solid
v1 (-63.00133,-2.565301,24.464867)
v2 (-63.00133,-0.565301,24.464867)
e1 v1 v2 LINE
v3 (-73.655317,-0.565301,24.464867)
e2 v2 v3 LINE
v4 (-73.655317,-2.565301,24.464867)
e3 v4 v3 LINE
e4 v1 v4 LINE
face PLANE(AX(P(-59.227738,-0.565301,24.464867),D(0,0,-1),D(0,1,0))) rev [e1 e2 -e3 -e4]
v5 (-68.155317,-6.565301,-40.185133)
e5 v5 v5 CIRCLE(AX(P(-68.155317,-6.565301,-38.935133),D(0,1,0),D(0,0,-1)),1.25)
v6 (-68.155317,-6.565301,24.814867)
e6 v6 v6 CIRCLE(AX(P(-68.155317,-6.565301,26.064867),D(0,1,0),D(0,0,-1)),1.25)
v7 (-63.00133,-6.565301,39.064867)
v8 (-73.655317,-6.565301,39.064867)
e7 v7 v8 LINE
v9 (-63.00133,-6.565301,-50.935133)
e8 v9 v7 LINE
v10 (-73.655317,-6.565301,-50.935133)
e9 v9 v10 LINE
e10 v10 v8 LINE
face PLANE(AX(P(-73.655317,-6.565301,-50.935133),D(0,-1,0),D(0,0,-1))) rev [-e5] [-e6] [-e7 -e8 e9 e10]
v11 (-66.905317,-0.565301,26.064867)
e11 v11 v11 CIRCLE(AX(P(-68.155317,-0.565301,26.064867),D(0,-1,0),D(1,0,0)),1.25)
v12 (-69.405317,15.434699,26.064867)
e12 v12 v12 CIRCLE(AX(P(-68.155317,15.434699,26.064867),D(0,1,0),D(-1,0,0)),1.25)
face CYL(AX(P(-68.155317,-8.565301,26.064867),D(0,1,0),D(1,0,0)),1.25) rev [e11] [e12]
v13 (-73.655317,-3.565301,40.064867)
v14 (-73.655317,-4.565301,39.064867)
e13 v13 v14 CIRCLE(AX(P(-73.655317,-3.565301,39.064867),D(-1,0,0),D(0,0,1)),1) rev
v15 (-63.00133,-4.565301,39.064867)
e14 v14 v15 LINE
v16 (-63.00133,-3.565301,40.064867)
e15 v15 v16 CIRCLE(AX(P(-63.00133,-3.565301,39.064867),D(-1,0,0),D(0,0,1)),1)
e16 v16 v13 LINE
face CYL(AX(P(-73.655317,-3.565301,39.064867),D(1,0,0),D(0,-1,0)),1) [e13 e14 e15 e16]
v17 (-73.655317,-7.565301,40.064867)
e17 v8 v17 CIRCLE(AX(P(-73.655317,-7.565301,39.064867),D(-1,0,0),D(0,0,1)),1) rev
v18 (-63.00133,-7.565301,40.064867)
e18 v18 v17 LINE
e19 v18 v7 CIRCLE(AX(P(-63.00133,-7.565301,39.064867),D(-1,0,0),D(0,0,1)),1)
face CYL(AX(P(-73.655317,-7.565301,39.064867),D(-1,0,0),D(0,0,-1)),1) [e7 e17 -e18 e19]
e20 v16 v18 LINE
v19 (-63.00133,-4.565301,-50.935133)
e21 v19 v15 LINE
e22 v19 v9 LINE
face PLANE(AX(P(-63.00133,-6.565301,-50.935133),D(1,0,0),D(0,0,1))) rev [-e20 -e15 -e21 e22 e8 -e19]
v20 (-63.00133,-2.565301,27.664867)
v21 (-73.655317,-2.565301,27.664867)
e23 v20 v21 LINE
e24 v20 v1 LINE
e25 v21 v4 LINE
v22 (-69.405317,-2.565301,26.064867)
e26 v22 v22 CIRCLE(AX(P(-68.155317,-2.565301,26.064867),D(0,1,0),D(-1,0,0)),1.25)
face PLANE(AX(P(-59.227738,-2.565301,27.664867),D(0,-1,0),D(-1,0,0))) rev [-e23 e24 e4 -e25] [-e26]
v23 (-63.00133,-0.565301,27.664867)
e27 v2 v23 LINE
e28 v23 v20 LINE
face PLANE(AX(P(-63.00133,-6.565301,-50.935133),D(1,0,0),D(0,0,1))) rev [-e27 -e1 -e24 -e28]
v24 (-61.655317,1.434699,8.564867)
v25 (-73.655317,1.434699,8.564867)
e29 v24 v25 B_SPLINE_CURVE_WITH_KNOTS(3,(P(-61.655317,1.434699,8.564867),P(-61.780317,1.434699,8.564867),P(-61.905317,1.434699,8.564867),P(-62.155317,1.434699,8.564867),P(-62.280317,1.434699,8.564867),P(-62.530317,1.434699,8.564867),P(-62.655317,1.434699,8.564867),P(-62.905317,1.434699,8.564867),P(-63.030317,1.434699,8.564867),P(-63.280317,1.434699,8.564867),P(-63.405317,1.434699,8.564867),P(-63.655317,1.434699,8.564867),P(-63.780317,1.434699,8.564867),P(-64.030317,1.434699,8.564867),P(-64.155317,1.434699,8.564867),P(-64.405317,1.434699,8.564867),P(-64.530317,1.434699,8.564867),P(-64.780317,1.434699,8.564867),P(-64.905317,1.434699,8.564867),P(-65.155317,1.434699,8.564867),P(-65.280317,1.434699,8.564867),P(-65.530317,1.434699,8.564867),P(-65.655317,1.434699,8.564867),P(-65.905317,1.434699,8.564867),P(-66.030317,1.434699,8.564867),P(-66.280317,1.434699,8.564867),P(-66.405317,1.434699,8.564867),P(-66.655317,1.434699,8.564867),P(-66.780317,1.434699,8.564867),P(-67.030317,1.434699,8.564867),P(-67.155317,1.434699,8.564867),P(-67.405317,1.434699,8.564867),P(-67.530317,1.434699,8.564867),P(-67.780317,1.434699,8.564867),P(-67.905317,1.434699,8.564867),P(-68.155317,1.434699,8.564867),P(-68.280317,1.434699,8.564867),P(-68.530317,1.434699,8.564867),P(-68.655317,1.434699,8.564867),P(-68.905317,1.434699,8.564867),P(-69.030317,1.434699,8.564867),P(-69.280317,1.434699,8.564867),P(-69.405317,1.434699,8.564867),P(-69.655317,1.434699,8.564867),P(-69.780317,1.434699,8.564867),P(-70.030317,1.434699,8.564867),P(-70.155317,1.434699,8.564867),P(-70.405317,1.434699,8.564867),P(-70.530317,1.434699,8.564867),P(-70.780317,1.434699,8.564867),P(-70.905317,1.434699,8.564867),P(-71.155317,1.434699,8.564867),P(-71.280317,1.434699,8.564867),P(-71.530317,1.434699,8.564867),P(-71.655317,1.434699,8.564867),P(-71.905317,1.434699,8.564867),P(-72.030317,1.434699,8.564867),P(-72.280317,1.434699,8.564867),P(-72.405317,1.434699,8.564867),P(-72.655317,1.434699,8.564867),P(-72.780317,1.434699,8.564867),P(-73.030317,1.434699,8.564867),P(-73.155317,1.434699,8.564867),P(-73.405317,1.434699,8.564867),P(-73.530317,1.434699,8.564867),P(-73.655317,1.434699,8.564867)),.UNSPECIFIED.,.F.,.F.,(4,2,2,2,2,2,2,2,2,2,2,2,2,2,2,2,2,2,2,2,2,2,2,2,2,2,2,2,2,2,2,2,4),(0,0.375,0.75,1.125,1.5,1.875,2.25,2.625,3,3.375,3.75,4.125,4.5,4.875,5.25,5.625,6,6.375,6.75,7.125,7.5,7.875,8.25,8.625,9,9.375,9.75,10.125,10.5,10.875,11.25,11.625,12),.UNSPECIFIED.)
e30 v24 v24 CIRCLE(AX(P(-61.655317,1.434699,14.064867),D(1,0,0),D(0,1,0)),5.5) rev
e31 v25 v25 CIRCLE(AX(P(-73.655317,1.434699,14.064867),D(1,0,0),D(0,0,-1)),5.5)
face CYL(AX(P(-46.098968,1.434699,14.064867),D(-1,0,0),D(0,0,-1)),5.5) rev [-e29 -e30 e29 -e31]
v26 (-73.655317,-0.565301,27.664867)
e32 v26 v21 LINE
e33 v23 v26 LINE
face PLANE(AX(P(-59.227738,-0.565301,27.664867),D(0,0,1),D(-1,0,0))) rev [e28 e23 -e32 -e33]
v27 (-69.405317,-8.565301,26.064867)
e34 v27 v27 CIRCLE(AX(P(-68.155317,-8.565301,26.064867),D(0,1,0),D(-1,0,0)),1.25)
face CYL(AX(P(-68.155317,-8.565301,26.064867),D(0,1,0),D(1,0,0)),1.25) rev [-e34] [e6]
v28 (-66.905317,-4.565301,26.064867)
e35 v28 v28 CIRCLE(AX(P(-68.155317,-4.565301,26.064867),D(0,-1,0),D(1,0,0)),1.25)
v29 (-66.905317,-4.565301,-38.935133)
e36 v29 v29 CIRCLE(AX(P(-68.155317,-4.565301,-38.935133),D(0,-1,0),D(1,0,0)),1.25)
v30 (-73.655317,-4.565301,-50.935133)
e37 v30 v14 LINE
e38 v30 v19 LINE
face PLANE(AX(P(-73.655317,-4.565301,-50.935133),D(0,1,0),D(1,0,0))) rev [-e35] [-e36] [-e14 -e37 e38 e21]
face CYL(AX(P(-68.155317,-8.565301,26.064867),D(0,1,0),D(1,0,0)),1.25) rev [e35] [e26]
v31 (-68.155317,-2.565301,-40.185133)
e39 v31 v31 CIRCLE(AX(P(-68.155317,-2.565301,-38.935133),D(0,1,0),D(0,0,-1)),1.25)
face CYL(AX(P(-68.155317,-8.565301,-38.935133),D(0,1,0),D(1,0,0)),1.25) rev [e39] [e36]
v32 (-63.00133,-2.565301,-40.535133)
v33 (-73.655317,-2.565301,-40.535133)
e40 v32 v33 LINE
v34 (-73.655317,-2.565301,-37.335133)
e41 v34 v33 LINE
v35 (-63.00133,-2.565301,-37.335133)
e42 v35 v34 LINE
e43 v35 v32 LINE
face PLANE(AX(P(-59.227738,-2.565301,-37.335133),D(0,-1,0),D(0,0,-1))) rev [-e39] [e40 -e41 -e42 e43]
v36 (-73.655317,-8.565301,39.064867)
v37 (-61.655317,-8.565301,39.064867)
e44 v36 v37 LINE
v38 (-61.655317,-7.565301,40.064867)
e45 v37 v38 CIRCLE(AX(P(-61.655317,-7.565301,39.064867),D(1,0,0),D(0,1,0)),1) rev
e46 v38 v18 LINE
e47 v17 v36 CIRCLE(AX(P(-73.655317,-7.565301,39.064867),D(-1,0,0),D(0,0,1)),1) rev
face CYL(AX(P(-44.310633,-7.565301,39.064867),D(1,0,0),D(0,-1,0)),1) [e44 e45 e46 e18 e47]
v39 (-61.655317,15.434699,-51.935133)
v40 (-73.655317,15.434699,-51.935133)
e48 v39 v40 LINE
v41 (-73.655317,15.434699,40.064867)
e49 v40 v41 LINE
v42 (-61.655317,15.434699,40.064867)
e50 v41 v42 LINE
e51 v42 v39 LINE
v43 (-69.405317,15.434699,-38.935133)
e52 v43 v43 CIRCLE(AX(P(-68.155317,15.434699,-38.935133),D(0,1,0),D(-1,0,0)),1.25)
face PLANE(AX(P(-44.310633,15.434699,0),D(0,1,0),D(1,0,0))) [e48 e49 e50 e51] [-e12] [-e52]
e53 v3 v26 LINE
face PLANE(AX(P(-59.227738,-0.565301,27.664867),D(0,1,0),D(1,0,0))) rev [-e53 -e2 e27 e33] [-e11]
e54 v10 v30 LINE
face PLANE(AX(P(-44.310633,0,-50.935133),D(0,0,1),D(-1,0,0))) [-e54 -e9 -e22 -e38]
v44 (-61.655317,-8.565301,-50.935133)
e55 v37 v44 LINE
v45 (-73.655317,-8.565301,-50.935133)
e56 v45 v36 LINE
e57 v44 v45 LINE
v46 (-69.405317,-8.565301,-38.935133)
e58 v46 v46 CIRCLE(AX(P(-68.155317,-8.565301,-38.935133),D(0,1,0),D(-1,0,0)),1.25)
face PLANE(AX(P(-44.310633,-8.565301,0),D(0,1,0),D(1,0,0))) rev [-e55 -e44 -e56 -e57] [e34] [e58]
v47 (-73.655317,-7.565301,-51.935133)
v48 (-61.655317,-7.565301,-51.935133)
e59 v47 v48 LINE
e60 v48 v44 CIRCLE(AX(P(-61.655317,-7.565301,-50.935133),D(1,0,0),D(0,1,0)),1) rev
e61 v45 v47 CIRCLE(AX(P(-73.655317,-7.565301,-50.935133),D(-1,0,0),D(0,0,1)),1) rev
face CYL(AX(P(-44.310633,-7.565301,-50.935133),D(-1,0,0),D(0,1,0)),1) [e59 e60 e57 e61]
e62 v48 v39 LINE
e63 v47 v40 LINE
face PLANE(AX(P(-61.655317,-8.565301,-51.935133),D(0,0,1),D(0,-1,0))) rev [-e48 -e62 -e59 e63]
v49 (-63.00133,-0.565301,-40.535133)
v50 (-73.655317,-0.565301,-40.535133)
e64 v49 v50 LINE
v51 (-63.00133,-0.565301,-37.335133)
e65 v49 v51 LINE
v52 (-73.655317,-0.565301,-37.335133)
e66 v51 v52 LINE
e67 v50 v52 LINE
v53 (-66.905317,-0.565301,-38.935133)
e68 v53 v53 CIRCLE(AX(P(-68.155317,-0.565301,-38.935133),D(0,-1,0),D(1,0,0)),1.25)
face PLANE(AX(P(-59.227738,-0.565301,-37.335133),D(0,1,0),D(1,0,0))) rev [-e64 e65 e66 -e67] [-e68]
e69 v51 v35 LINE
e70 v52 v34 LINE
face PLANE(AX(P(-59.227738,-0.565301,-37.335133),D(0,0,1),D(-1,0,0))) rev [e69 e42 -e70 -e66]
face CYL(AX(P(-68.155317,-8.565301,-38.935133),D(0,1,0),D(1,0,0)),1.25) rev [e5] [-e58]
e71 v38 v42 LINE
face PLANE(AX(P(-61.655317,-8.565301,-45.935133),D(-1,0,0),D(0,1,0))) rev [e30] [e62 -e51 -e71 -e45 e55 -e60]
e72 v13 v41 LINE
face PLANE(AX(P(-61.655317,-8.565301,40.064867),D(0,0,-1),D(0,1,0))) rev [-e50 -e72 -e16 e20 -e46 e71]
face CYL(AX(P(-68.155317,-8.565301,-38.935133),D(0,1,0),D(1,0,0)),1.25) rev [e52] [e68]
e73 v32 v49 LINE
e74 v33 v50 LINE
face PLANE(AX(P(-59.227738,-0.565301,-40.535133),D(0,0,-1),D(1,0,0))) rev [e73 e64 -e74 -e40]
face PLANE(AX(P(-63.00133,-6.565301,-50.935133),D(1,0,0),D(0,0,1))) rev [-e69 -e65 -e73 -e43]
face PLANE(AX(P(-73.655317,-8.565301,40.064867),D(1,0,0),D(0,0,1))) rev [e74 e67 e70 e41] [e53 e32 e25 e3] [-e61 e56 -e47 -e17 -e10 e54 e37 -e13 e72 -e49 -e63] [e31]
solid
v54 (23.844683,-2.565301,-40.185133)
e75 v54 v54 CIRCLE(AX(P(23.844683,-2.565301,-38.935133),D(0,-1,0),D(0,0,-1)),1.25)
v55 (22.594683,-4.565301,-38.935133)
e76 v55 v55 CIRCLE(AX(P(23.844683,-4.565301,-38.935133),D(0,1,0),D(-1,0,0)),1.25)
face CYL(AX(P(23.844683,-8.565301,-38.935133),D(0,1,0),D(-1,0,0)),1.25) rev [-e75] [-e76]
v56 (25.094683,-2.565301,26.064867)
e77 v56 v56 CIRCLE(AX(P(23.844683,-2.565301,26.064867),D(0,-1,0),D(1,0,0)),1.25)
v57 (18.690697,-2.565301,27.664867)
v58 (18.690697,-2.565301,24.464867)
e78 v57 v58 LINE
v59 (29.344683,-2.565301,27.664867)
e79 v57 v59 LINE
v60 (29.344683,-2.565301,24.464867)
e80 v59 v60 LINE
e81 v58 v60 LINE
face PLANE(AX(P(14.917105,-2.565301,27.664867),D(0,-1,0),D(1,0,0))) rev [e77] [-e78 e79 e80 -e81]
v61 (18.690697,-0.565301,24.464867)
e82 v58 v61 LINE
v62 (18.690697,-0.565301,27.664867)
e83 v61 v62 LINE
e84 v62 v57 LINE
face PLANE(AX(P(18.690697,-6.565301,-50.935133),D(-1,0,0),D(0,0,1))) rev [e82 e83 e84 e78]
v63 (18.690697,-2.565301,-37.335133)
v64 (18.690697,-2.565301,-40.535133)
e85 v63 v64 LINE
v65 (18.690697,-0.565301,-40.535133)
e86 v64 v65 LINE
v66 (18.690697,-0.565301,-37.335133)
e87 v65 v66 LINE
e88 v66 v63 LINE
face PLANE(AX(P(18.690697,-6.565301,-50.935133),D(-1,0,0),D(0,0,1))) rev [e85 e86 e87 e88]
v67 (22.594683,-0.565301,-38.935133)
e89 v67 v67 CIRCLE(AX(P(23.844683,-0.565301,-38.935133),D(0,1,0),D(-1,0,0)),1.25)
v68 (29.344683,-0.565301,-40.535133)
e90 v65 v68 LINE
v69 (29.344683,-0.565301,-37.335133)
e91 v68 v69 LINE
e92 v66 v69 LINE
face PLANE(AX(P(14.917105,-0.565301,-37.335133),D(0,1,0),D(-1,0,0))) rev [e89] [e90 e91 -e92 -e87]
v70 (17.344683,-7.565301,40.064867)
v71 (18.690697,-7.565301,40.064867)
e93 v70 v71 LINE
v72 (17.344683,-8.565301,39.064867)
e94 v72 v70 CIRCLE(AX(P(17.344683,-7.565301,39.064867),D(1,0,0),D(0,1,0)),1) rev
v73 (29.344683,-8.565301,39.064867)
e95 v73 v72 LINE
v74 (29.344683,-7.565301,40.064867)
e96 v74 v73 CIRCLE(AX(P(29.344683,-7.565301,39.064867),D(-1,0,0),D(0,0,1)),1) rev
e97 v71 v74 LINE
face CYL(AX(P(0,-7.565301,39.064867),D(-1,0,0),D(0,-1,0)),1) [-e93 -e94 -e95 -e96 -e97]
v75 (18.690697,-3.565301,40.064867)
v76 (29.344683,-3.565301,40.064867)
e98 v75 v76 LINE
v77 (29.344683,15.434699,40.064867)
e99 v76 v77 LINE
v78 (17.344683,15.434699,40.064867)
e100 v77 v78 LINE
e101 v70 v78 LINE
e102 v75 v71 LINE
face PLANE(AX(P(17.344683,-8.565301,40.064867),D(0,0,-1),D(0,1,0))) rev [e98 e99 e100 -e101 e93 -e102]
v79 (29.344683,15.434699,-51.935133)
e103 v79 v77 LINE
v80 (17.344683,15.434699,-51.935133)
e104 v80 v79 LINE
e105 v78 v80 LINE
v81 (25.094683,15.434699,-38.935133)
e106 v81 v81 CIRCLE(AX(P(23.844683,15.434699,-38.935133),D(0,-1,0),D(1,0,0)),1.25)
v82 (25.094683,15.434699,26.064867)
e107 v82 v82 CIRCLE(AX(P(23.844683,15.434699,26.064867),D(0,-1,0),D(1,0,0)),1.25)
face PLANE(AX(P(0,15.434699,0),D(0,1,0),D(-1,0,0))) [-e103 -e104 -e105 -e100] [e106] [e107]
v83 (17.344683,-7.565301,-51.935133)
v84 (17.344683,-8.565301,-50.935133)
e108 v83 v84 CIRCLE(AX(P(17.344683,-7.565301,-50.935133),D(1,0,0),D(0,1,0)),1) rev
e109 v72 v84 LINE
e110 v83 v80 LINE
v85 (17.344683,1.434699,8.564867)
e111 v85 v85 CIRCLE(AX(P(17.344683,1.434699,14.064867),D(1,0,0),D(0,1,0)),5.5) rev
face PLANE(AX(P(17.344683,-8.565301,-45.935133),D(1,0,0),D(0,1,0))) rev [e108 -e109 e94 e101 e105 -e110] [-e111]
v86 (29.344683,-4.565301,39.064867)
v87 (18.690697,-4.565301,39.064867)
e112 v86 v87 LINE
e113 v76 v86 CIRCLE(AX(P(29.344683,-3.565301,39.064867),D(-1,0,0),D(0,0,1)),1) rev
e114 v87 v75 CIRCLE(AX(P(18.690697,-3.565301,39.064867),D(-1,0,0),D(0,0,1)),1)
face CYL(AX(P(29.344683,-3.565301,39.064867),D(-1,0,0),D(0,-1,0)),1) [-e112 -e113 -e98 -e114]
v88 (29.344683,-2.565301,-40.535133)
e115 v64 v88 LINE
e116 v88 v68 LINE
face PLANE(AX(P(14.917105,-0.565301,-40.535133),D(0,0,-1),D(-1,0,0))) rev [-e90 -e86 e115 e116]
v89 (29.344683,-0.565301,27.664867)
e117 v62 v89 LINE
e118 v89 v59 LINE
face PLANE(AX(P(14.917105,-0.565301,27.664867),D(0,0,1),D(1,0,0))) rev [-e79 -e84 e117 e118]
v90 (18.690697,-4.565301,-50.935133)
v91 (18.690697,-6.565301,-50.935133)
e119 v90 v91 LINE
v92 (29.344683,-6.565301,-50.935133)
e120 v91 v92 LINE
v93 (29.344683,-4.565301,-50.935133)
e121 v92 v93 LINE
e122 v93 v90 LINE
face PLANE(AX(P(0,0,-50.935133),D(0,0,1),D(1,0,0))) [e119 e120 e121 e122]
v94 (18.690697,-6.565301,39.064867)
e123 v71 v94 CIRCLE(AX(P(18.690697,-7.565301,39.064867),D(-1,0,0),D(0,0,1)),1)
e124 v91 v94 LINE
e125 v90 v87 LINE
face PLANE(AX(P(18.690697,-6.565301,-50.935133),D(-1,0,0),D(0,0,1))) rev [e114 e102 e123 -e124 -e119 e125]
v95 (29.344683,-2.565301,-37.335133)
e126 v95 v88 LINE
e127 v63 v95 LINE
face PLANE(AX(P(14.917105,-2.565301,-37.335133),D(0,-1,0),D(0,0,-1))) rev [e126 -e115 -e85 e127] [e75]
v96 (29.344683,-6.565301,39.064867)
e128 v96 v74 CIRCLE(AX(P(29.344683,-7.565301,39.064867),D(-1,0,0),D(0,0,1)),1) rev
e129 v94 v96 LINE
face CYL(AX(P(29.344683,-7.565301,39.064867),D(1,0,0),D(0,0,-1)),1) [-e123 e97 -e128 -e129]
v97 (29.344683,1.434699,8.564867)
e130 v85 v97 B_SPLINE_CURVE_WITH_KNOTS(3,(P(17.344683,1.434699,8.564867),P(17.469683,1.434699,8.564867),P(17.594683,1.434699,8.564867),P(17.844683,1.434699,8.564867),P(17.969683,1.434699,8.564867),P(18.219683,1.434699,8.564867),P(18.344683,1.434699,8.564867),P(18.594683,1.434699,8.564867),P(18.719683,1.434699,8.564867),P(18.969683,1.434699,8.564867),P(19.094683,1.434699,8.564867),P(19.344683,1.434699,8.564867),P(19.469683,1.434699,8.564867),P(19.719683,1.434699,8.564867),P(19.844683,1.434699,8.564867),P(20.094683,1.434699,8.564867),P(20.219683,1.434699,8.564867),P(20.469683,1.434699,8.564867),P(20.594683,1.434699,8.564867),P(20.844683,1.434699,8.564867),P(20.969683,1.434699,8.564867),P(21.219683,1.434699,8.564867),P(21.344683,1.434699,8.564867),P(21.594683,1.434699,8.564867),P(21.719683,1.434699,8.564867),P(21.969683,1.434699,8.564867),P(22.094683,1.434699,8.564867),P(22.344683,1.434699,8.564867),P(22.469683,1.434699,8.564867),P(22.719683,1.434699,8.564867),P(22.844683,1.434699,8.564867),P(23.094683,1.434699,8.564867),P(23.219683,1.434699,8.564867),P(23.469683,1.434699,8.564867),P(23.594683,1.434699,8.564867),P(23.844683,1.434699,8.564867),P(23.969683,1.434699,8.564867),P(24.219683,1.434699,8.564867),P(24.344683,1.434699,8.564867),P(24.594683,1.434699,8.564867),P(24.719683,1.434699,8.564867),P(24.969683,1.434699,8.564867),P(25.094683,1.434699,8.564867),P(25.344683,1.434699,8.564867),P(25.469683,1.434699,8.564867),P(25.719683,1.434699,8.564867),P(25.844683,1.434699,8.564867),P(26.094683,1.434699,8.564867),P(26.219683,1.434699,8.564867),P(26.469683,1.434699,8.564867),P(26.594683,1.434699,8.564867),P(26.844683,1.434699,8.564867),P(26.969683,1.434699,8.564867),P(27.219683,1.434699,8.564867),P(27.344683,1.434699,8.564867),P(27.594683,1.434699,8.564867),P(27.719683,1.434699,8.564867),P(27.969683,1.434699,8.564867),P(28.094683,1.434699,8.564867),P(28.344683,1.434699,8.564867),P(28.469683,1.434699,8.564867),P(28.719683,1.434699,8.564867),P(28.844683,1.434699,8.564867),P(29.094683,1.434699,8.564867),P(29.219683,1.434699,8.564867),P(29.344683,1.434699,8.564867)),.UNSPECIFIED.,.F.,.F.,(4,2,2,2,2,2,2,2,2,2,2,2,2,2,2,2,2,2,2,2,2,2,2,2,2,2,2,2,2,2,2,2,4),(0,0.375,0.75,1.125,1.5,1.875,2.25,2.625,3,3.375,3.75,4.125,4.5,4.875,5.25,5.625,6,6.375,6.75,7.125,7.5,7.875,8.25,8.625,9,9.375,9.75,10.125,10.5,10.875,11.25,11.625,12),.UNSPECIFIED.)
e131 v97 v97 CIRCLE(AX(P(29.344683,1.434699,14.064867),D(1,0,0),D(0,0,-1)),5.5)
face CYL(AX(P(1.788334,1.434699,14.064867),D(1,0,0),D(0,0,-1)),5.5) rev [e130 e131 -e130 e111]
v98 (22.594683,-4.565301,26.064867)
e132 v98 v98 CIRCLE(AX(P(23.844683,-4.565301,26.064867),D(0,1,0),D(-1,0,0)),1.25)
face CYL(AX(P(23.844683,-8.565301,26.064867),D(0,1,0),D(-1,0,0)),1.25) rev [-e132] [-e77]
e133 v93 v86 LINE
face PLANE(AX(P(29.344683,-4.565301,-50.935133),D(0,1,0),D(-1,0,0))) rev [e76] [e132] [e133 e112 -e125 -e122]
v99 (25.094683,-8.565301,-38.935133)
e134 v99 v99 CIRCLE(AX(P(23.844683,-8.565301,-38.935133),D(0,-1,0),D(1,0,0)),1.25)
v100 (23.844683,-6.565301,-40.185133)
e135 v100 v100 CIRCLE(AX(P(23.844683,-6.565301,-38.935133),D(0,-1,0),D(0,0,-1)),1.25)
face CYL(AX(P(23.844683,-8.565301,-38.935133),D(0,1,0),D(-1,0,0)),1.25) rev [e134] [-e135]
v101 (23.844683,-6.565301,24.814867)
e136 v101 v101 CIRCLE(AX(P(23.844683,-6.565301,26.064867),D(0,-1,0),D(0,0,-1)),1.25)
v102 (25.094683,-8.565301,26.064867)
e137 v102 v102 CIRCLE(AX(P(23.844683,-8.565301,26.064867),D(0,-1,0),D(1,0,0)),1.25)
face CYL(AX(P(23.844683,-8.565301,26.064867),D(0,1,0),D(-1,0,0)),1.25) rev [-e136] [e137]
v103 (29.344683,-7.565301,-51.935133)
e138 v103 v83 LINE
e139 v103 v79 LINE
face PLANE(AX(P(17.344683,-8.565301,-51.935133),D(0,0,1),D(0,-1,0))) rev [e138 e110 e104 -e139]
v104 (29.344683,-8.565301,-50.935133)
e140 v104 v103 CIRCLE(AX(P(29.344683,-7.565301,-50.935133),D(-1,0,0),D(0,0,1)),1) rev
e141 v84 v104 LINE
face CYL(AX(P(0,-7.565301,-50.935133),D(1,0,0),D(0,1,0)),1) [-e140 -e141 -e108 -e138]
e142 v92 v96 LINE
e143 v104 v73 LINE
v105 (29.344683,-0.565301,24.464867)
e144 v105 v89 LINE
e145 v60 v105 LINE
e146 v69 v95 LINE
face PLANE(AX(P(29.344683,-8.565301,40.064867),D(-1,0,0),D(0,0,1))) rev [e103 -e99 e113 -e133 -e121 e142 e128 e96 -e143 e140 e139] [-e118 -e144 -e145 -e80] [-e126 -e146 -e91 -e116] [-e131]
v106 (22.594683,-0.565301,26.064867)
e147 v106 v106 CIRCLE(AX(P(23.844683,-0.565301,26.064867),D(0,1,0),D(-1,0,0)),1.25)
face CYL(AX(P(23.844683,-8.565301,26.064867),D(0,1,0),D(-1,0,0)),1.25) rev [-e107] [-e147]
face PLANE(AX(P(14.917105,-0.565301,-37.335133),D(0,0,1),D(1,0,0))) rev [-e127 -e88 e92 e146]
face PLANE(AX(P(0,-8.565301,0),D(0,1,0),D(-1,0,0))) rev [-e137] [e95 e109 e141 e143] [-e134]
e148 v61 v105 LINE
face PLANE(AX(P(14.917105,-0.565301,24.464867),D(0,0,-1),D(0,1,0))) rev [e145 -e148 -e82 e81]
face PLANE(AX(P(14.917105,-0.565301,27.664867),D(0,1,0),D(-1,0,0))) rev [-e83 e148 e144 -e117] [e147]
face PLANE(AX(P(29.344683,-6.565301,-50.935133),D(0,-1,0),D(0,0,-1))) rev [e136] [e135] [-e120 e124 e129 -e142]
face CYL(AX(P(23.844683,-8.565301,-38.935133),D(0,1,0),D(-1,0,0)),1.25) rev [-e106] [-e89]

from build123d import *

# Parameters (mm, degrees)
SKETCH3_R           = 1.25
BOSS_EXTRUDE1_DEPTH = 24
SKETCH6_W           = 10.653986256
SKETCH6_H           = 2
CUT_EXTRUDE1_DEPTH  = 91
CUT_EXTRUDE3_REACH  = 57.493
SKETCH7_W           = 3.2
SKETCH7_H           = 2
FILLET1_R           = 1
SKETCH8_R           = 5.5
CUT_EXTRUDE4_DEPTH  = 12


with BuildPart() as part:
    # Sketch3 → Boss-Extrude1 (new body)
    with BuildSketch(Plane.XZ.offset(-15.434699117)):
        Polygon((17.344683291, 34.064867032), (17.344683291, -45.935132968), (17.344683291, -51.935132968), (29.344683291, -51.935132968), (29.344683291, -45.935132968), (29.344683291, 34.064867032), (29.344683291, 40.064867032), (17.344683291, 40.064867032), align=None)
        with Locations((23.844683291, -38.935132968)):
            Circle(SKETCH3_R, mode=Mode.SUBTRACT)
        with Locations((23.844683291, 26.064867032)):
            Circle(SKETCH3_R, mode=Mode.SUBTRACT)
    extrude(amount=BOSS_EXTRUDE1_DEPTH)

    # Sketch6 → Cut-Extrude1 (cut)
    with BuildSketch(Plane.XY.offset(40.064867032)):
        with Locations((24.017690163, -5.565300883)):
            Rectangle(SKETCH6_W, SKETCH6_H)
    extrude(amount=-CUT_EXTRUDE1_DEPTH, mode=Mode.SUBTRACT)

    # Cut-Extrude3: up to this face of the body (flat: up to its plane)
    cut_extrude3_end = Plane(part.part.faces().sort_by_distance((18.690697035, -5.565300883, -5.435132968))[0])
    # Sketch7 → Cut-Extrude3 (cut, up to the picked face)
    with BuildSketch(Plane(origin=(29.344683291, 0, 0), x_dir=(0, 0, -1), z_dir=(1, 0, 0)), mode=Mode.PRIVATE) as cut_extrude3_sk1:
        with Locations((-26.064867032, -1.565300883)):
            Rectangle(SKETCH7_W, SKETCH7_H)
    cut_extrude3_tool1 = split(extrude(cut_extrude3_sk1.sketch, amount=-CUT_EXTRUDE3_REACH, mode=Mode.PRIVATE), bisect_by=cut_extrude3_end, keep=Keep.BOTH, mode=Mode.PRIVATE)
    # Sketch7 → Cut-Extrude3 (cut, up to the picked face)
    with BuildSketch(Plane(origin=(29.344683291, 0, 0), x_dir=(0, 0, -1), z_dir=(1, 0, 0)), mode=Mode.PRIVATE) as cut_extrude3_sk2:
        with Locations((38.935132968, -1.565300883)):
            Rectangle(SKETCH7_W, SKETCH7_H)
    cut_extrude3_tool2 = split(extrude(cut_extrude3_sk2.sketch, amount=-CUT_EXTRUDE3_REACH, mode=Mode.PRIVATE), bisect_by=cut_extrude3_end, keep=Keep.BOTH, mode=Mode.PRIVATE)
    add(cut_extrude3_tool1.solids().sort_by(Axis((29.344683, -1.565301, 26.064867), (-1, 0, 0)))[0], mode=Mode.SUBTRACT)
    add(cut_extrude3_tool2.solids().sort_by(Axis((29.344683, -1.565301, -38.935133), (-1, 0, 0)))[0], mode=Mode.SUBTRACT)

    # Fillet1
    fillet1_edges = [part.edges().sort_by_distance(p)[0] for p in [
        (23.344683291, -8.565300883, -51.935132968),
        (23.344683291, -8.565300883, 40.064867032),
        (24.017690163, -6.565300883, 40.064867032),
        (24.017690163, -4.565300883, 40.064867032),
    ]]
    fillet(fillet1_edges, radius=FILLET1_R - 0.0001)  # a hair under: the kernel refuses the full size

    # Sketch8 → Cut-Extrude4 (cut)
    with BuildSketch(Plane(origin=(29.344683291, 0, 0), x_dir=(0, 0, -1), z_dir=(1, 0, 0))):
        with Locations((-14.064867032, 1.434699117)):
            Circle(SKETCH8_R)
    extrude(amount=-CUT_EXTRUDE4_DEPTH, mode=Mode.SUBTRACT)


with BuildPart() as body_2:
    # Mirror4: mirrored copy
    add(part.part.mirror(Plane.ZY.offset(22.155316709)))


solid = Compound([part.part, body_2.part])
